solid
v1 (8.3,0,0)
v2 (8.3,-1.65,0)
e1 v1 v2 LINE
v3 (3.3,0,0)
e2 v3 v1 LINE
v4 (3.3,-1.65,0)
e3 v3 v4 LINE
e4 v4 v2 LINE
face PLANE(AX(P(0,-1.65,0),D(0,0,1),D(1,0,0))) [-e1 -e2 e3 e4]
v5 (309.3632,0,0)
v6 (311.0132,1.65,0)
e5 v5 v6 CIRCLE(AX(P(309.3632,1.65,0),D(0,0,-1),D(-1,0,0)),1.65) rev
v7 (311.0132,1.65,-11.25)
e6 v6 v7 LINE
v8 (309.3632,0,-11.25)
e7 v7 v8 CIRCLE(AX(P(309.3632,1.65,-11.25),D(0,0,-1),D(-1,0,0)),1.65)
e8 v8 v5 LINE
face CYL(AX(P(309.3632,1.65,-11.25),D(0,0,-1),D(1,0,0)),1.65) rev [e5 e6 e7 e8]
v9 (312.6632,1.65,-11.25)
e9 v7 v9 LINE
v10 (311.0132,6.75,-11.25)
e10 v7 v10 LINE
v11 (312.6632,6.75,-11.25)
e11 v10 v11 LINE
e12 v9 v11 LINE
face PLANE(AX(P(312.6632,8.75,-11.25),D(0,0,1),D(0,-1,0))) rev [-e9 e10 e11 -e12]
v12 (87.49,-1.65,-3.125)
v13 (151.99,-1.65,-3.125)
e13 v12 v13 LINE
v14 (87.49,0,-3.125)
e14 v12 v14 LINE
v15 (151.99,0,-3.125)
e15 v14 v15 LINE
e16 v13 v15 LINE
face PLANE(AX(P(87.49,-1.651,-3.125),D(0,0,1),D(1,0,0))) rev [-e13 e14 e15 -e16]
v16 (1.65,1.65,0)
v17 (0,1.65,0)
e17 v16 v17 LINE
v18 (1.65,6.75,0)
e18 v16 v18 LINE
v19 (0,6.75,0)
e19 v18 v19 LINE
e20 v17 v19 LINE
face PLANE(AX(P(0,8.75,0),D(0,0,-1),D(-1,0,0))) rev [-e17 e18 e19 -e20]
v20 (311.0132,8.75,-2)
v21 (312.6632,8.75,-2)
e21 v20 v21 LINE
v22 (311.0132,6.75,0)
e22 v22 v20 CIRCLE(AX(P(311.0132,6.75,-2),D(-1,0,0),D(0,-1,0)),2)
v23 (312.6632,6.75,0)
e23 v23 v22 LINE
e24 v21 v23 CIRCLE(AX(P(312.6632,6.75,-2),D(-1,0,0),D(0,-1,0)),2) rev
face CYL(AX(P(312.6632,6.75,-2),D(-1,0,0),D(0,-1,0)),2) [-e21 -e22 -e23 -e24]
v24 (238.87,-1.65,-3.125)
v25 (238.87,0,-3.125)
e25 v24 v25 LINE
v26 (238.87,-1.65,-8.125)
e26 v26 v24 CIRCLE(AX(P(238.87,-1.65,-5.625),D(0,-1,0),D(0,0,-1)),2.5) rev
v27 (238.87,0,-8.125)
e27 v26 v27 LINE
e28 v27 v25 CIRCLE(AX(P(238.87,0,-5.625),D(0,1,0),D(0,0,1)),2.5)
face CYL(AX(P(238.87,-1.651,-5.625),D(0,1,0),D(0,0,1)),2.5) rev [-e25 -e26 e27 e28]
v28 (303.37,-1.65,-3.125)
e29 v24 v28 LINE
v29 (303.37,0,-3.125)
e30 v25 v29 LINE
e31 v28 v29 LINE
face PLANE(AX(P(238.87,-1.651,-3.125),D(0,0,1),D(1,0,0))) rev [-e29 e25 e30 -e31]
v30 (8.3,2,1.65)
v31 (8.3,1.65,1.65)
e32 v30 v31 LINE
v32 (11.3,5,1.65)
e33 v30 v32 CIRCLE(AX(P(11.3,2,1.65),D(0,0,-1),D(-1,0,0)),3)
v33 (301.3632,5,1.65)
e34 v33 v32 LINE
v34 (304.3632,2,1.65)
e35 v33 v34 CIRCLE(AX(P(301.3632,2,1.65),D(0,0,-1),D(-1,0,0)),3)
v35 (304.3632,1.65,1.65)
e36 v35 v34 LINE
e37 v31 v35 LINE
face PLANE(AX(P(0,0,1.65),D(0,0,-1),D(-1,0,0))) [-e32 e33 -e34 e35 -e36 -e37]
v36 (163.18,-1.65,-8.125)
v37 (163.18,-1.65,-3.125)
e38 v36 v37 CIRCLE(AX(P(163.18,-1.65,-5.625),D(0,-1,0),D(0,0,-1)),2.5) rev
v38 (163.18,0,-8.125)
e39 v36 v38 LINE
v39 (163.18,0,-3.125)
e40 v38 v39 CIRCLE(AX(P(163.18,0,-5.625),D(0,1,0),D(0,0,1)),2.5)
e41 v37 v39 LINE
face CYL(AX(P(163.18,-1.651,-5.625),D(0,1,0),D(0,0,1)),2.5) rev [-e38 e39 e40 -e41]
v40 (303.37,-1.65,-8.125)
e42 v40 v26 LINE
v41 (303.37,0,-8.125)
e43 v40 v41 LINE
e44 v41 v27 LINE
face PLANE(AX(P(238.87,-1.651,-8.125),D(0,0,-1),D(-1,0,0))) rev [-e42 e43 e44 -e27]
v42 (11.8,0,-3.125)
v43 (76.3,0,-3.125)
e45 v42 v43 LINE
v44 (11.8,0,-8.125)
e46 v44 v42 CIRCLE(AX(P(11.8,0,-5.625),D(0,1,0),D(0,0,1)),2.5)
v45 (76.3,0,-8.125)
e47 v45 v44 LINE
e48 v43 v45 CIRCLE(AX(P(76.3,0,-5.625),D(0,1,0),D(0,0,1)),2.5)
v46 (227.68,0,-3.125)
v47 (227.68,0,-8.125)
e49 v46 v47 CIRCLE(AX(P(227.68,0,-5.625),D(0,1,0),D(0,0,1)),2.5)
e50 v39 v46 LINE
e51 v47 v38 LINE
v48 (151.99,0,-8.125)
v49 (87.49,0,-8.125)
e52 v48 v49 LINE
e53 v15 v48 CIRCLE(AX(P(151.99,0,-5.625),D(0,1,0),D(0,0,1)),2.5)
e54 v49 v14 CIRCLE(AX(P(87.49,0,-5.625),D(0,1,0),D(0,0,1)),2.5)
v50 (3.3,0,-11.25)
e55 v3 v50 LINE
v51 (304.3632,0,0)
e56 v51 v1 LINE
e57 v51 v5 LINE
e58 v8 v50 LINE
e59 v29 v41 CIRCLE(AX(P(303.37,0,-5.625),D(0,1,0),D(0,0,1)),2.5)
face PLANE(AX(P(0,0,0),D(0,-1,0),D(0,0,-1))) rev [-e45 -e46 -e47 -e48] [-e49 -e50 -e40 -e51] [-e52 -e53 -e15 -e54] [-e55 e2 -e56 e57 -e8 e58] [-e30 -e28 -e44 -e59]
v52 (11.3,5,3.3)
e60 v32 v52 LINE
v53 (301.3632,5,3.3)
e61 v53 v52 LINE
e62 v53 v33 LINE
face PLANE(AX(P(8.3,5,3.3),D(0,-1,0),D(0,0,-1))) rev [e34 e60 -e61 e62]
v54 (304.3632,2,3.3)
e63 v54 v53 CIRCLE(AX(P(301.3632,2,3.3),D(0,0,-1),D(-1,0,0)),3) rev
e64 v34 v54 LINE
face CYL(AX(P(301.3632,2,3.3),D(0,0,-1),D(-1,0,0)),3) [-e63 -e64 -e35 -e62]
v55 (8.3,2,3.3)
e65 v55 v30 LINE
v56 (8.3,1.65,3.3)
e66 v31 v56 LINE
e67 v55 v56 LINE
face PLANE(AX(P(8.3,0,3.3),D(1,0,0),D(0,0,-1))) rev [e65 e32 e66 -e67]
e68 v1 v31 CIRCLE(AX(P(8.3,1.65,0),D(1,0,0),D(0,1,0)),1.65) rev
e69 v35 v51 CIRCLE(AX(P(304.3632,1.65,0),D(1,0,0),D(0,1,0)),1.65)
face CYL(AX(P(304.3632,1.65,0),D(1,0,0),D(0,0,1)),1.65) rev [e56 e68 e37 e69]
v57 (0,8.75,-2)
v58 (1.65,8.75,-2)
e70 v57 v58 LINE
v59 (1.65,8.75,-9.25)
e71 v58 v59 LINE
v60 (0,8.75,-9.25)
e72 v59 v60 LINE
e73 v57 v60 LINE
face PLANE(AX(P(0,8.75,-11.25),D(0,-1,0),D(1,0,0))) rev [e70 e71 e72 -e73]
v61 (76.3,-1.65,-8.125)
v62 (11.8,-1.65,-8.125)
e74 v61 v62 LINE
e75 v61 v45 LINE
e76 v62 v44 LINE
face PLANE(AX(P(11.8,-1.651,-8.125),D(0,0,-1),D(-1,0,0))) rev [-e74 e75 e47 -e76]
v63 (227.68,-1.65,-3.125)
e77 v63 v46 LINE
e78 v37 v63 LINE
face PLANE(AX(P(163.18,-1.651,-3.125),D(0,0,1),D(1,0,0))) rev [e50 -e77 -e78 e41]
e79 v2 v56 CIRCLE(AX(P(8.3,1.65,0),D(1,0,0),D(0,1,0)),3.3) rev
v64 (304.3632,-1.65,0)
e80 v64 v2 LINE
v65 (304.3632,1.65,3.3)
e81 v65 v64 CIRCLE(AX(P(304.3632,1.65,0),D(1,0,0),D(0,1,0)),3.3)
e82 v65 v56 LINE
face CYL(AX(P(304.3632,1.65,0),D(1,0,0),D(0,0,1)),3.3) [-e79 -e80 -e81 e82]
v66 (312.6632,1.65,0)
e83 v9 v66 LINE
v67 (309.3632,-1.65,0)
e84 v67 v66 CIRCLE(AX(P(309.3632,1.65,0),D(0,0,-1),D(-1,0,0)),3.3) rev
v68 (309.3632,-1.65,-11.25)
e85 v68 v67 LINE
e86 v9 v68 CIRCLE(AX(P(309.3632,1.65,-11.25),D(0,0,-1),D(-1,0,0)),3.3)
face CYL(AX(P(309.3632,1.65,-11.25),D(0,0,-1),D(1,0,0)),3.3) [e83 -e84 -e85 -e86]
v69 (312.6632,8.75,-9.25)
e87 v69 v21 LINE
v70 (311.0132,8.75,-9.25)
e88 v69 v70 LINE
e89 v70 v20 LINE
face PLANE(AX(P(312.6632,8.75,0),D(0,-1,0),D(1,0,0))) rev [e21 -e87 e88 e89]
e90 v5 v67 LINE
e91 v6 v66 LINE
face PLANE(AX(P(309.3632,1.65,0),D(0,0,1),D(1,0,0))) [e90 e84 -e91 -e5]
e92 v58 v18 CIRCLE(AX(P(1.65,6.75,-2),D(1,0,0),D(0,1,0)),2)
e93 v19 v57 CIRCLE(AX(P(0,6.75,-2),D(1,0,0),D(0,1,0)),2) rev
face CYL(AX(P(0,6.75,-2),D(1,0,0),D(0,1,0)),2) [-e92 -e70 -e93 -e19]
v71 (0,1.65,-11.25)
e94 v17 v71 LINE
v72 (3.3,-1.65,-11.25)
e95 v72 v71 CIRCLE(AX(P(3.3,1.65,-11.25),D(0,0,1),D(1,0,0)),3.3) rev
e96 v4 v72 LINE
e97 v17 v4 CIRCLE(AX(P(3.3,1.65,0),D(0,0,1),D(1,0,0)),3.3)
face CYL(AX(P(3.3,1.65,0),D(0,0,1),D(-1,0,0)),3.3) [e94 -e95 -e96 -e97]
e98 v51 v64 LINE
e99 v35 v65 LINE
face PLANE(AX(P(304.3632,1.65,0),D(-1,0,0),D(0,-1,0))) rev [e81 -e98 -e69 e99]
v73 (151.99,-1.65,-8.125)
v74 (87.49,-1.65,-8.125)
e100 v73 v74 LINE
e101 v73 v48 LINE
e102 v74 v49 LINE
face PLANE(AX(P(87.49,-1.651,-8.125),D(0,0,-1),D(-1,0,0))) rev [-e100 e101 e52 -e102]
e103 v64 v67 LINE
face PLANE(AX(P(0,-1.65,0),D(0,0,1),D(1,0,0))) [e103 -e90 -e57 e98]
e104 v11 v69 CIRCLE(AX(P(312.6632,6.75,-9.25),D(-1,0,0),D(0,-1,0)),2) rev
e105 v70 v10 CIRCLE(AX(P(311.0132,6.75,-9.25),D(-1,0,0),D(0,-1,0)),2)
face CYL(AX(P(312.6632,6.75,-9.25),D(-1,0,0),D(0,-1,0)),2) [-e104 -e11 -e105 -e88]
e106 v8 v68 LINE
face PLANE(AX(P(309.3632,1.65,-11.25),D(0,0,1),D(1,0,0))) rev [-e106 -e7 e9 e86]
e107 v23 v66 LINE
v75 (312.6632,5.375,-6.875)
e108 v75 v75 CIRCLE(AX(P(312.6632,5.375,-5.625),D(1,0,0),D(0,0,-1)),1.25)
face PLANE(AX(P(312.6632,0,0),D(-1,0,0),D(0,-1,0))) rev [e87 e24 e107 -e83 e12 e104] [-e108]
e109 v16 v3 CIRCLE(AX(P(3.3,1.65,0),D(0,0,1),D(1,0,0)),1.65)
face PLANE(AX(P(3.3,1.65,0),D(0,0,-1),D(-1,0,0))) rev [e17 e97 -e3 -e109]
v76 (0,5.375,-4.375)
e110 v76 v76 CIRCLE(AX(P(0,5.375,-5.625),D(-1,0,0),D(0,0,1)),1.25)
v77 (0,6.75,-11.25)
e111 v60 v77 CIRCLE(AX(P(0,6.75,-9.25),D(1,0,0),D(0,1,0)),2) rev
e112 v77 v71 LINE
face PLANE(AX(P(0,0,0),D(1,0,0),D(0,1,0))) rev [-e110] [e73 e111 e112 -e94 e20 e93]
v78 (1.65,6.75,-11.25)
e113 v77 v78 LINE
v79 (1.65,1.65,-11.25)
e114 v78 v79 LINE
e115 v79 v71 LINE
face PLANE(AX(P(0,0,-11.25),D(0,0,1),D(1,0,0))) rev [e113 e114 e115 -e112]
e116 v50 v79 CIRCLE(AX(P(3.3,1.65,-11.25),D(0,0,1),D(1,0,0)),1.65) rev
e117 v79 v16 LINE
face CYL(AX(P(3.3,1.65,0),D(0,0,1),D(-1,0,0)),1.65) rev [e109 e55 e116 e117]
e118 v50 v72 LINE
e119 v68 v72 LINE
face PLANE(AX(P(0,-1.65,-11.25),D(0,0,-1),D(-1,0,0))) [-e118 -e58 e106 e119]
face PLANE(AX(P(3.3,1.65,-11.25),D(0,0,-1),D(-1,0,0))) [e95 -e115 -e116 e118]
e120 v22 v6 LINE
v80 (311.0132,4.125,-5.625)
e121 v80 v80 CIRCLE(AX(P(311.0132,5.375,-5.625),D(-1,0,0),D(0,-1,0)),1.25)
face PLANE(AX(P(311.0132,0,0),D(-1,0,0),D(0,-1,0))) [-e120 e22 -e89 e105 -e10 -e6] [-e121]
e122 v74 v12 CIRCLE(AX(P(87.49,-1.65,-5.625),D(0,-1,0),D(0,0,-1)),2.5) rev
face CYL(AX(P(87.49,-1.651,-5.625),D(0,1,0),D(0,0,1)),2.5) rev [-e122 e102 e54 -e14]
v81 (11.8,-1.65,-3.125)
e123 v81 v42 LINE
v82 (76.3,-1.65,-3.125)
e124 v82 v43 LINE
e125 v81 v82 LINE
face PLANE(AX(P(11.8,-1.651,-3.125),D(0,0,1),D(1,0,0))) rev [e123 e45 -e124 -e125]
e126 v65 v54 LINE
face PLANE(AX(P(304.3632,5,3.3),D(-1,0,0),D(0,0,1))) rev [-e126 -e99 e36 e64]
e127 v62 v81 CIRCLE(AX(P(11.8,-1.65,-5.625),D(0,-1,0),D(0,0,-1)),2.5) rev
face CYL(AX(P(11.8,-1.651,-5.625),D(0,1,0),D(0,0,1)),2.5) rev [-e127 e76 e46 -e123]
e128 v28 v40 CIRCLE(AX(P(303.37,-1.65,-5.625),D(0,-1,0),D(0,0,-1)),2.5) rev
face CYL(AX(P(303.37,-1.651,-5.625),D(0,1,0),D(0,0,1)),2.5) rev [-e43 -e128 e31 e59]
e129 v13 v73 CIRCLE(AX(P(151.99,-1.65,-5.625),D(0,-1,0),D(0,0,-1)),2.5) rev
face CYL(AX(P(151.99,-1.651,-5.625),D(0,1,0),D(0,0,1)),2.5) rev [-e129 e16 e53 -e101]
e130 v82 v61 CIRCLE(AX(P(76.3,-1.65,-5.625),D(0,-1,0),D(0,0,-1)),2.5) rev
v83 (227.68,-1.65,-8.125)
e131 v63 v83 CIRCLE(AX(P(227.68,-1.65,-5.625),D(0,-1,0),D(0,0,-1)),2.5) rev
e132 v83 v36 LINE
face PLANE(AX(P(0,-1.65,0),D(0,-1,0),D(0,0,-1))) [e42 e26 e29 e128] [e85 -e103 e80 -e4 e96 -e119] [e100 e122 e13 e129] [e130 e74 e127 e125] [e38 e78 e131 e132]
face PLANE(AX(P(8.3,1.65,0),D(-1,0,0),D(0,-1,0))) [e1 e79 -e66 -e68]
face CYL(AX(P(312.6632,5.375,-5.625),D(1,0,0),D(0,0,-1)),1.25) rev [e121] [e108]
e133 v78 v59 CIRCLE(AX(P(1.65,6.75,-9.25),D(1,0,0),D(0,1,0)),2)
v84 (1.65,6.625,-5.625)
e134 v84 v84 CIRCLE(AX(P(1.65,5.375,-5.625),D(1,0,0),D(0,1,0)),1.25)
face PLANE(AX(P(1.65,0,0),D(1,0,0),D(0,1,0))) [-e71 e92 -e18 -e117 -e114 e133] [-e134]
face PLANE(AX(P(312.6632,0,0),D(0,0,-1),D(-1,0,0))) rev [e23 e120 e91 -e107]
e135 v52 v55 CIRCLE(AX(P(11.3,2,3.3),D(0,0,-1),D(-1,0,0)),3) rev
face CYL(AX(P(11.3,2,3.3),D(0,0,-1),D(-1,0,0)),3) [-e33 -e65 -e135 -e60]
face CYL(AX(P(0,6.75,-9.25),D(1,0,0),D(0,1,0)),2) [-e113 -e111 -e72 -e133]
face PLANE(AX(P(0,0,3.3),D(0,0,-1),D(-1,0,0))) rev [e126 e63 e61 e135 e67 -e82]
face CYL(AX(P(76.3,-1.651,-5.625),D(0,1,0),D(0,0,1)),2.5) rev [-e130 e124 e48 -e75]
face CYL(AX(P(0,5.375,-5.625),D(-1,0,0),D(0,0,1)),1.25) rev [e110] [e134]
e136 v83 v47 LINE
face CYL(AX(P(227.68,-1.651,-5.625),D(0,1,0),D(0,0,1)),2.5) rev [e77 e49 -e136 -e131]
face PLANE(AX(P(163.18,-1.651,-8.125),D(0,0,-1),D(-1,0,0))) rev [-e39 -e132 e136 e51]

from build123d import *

# Parameters (mm, degrees)
SKETCH1_W                             = 312.6632
SKETCH1_H                             = 11.25
BASE_FLANGE1_DEPTH                    = 1.65
EDGE_FLANGE1_STRIP_W                  = 9.9
EDGE_FLANGE1_STRIP_H                  = 1.65
EDGE_FLANGE1_STRIP_CUT_DEPTH          = 11.25
EDGE_FLANGE1_STRIP_2_W                = 9.9
EDGE_FLANGE1_STRIP_2_H                = 1.65
EDGE_FLANGE1_STRIP_CUT_2_DEPTH        = 11.25
EDGE_FLANGE1_DEPTH                    = 11.25
EDGE_FLANGE1_BEND_DEPTH               = 11.25
TAP_DRILL_FOR_M3X0_5_TAP1_D           = 2.5
TAP_DRILL_FOR_M3X0_5_TAP1_ON_FACE_2_D = 2.5
FILLET1_R                             = 2
CUT_EXTRUDE1_REACH                    = 314.988
EDGE_FLANGE2_DEPTH                    = 296.0632
FILLET2_R                             = 3


# Sheet-metal steps are written as plain solids
with BuildPart() as part:
    # Sketch1 → Base-Flange1 (new body)
    with BuildSketch(Plane(origin=(0, 0, 0), x_dir=(1, 0, 0), z_dir=(0, 1, 0))):
        with Locations((156.3316, 5.625)):
            Rectangle(SKETCH1_W, SKETCH1_H)
    extrude(amount=-BASE_FLANGE1_DEPTH)

    # Edge-Flange1 strip (across the edge) → Edge-Flange1 strip cut (cut)
    with BuildSketch(Plane.XY.offset(-11.25)):
        with Locations((-1.65, -0.825)):
            Rectangle(EDGE_FLANGE1_STRIP_W, EDGE_FLANGE1_STRIP_H)
    extrude(amount=EDGE_FLANGE1_STRIP_CUT_DEPTH, mode=Mode.SUBTRACT)

    # Edge-Flange1 strip 2 (across the edge) → Edge-Flange1 strip cut 2 (cut)
    with BuildSketch(Plane(origin=(312.6632, 0, 0), x_dir=(-1, 0, 0), z_dir=(0, 0, -1))):
        with Locations((-1.65, -0.825)):
            Rectangle(EDGE_FLANGE1_STRIP_2_W, EDGE_FLANGE1_STRIP_2_H)
    extrude(amount=EDGE_FLANGE1_STRIP_CUT_2_DEPTH, mode=Mode.SUBTRACT)

    # Edge-Flange1 section (across the edge) → Edge-Flange1 (add)
    with BuildSketch(Plane.XY.offset(-11.25)):
        with BuildLine():
            Line((0, 1.65), (0, 8.75))
            Line((0, 8.75), (1.65, 8.75))
            Line((1.65, 8.75), (1.65, 1.65))
            ThreePointArc((1.65, 1.65), (2.133273811, 0.483273811), (3.3, 0))
            Line((3.3, 0), (3.3, -1.65))
            ThreePointArc((3.3, -1.65), (0.966547622, -0.683452378), (0, 1.65))
        make_face()
    extrude(amount=EDGE_FLANGE1_DEPTH)

    # Edge-Flange1 section 2 (across the edge) → Edge-Flange1 bend (add)
    with BuildSketch(Plane(origin=(312.6632, 0, 0), x_dir=(-1, 0, 0), z_dir=(0, 0, -1))):
        with BuildLine():
            Line((0, 1.65), (0, 8.75))
            Line((0, 8.75), (1.65, 8.75))
            Line((1.65, 8.75), (1.65, 1.65))
            ThreePointArc((1.65, 1.65), (2.133273811, 0.483273811), (3.3, 0))
            Line((3.3, 0), (3.3, -1.65))
            ThreePointArc((3.3, -1.65), (0.966547622, -0.683452378), (0, 1.65))
        make_face()
    extrude(amount=EDGE_FLANGE1_BEND_DEPTH)

    # Tap Drill for M3x0.5 Tap1 (through all)
    with Locations(Plane(origin=(312.6632, 5.375, -5.625), x_dir=(0, 1, 0), z_dir=(1, 0, 0))):
        with Locations((0, 0)):
            Hole(TAP_DRILL_FOR_M3X0_5_TAP1_D / 2)

    # Tap Drill for M3x0.5 Tap1 on face 2 (through all)
    with Locations(Plane(origin=(0, 5.375, -5.625), x_dir=(0, 0, -1), z_dir=(-1, 0, 0))):
        with Locations((0, 0)):
            Hole(TAP_DRILL_FOR_M3X0_5_TAP1_ON_FACE_2_D / 2)

    # Fillet1
    fillet1_edges = [part.edges().sort_by_distance(p)[0] for p in [
        (0.825, 8.75, -11.25),
        (0.825, 8.75, 0),
        (311.8382, 8.75, 0),
        (311.8382, 8.75, -11.25),
    ]]
    fillet(fillet1_edges, radius=FILLET1_R)

    # Sketch15 → Cut-Extrude1 (cut, up to next)
    with BuildSketch(Plane(origin=(0, 0, 0), x_dir=(1, 0, 0), z_dir=(0, 1, 0)), mode=Mode.PRIVATE) as cut_extrude1_sk1:
        with BuildLine():
            Line((11.8, 8.125), (76.3, 8.125))
            ThreePointArc((76.3, 8.125), (78.8, 5.625), (76.3, 3.125))
            Line((76.3, 3.125), (11.8, 3.125))
            ThreePointArc((11.8, 3.125), (9.3, 5.625), (11.8, 8.125))
        make_face()
    cut_extrude1_tool1 = extrude(cut_extrude1_sk1.sketch, amount=-CUT_EXTRUDE1_REACH, mode=Mode.PRIVATE) & part.part
    # Sketch15 → Cut-Extrude1 (cut, up to next)
    with BuildSketch(Plane(origin=(0, 0, 0), x_dir=(1, 0, 0), z_dir=(0, 1, 0)), mode=Mode.PRIVATE) as cut_extrude1_sk2:
        with BuildLine():
            Line((87.49, 8.125), (151.99, 8.125))
            ThreePointArc((151.99, 8.125), (154.49, 5.625), (151.99, 3.125))
            Line((151.99, 3.125), (87.49, 3.125))
            ThreePointArc((87.49, 3.125), (84.99, 5.625), (87.49, 8.125))
        make_face()
    cut_extrude1_tool2 = extrude(cut_extrude1_sk2.sketch, amount=-CUT_EXTRUDE1_REACH, mode=Mode.PRIVATE) & part.part
    # Sketch15 → Cut-Extrude1 (cut, up to next)
    with BuildSketch(Plane(origin=(0, 0, 0), x_dir=(1, 0, 0), z_dir=(0, 1, 0)), mode=Mode.PRIVATE) as cut_extrude1_sk3:
        with BuildLine():
            Line((163.18, 8.125), (227.68, 8.125))
            ThreePointArc((227.68, 8.125), (230.18, 5.625), (227.68, 3.125))
            Line((227.68, 3.125), (163.18, 3.125))
            ThreePointArc((163.18, 3.125), (160.68, 5.625), (163.18, 8.125))
        make_face()
    cut_extrude1_tool3 = extrude(cut_extrude1_sk3.sketch, amount=-CUT_EXTRUDE1_REACH, mode=Mode.PRIVATE) & part.part
    # Sketch15 → Cut-Extrude1 (cut, up to next)
    with BuildSketch(Plane(origin=(0, 0, 0), x_dir=(1, 0, 0), z_dir=(0, 1, 0)), mode=Mode.PRIVATE) as cut_extrude1_sk4:
        with BuildLine():
            Line((238.87, 8.125), (303.37, 8.125))
            ThreePointArc((303.37, 8.125), (305.87, 5.625), (303.37, 3.125))
            Line((303.37, 3.125), (238.87, 3.125))
            ThreePointArc((238.87, 3.125), (236.37, 5.625), (238.87, 8.125))
        make_face()
    cut_extrude1_tool4 = extrude(cut_extrude1_sk4.sketch, amount=-CUT_EXTRUDE1_REACH, mode=Mode.PRIVATE) & part.part
    add(cut_extrude1_tool1.solids().sort_by_distance((44.05, 0, -5.625))[0], mode=Mode.SUBTRACT)
    add(cut_extrude1_tool2.solids().sort_by_distance((119.74, 0, -5.625))[0], mode=Mode.SUBTRACT)
    add(cut_extrude1_tool3.solids().sort_by_distance((195.43, 0, -5.625))[0], mode=Mode.SUBTRACT)
    add(cut_extrude1_tool4.solids().sort_by_distance((271.12, 0, -5.625))[0], mode=Mode.SUBTRACT)

    # Edge-Flange2 section (across the edge) → Edge-Flange2 (add)
    with BuildSketch(Plane(origin=(8.3, 0, 1.65), x_dir=(0, 0, -1), z_dir=(1, 0, 0))):
        with BuildLine():
            Line((-1.65, 1.65), (-1.65, 5))
            Line((-1.65, 5), (0, 5))
            Line((0, 5), (0, 1.65))
            ThreePointArc((0, 1.65), (0.483273811, 0.483273811), (1.65, 0))
            Line((1.65, 0), (1.65, -1.65))
            ThreePointArc((1.65, -1.65), (-0.683452378, -0.683452378), (-1.65, 1.65))
        make_face()
    extrude(amount=EDGE_FLANGE2_DEPTH)

    # Fillet2
    fillet2_edges = [part.edges().sort_by_distance(p)[0] for p in [
        (8.3, 5, 2.475),
        (304.3632, 5, 2.475),
    ]]
    fillet(fillet2_edges, radius=FILLET2_R)


solid = part.part
